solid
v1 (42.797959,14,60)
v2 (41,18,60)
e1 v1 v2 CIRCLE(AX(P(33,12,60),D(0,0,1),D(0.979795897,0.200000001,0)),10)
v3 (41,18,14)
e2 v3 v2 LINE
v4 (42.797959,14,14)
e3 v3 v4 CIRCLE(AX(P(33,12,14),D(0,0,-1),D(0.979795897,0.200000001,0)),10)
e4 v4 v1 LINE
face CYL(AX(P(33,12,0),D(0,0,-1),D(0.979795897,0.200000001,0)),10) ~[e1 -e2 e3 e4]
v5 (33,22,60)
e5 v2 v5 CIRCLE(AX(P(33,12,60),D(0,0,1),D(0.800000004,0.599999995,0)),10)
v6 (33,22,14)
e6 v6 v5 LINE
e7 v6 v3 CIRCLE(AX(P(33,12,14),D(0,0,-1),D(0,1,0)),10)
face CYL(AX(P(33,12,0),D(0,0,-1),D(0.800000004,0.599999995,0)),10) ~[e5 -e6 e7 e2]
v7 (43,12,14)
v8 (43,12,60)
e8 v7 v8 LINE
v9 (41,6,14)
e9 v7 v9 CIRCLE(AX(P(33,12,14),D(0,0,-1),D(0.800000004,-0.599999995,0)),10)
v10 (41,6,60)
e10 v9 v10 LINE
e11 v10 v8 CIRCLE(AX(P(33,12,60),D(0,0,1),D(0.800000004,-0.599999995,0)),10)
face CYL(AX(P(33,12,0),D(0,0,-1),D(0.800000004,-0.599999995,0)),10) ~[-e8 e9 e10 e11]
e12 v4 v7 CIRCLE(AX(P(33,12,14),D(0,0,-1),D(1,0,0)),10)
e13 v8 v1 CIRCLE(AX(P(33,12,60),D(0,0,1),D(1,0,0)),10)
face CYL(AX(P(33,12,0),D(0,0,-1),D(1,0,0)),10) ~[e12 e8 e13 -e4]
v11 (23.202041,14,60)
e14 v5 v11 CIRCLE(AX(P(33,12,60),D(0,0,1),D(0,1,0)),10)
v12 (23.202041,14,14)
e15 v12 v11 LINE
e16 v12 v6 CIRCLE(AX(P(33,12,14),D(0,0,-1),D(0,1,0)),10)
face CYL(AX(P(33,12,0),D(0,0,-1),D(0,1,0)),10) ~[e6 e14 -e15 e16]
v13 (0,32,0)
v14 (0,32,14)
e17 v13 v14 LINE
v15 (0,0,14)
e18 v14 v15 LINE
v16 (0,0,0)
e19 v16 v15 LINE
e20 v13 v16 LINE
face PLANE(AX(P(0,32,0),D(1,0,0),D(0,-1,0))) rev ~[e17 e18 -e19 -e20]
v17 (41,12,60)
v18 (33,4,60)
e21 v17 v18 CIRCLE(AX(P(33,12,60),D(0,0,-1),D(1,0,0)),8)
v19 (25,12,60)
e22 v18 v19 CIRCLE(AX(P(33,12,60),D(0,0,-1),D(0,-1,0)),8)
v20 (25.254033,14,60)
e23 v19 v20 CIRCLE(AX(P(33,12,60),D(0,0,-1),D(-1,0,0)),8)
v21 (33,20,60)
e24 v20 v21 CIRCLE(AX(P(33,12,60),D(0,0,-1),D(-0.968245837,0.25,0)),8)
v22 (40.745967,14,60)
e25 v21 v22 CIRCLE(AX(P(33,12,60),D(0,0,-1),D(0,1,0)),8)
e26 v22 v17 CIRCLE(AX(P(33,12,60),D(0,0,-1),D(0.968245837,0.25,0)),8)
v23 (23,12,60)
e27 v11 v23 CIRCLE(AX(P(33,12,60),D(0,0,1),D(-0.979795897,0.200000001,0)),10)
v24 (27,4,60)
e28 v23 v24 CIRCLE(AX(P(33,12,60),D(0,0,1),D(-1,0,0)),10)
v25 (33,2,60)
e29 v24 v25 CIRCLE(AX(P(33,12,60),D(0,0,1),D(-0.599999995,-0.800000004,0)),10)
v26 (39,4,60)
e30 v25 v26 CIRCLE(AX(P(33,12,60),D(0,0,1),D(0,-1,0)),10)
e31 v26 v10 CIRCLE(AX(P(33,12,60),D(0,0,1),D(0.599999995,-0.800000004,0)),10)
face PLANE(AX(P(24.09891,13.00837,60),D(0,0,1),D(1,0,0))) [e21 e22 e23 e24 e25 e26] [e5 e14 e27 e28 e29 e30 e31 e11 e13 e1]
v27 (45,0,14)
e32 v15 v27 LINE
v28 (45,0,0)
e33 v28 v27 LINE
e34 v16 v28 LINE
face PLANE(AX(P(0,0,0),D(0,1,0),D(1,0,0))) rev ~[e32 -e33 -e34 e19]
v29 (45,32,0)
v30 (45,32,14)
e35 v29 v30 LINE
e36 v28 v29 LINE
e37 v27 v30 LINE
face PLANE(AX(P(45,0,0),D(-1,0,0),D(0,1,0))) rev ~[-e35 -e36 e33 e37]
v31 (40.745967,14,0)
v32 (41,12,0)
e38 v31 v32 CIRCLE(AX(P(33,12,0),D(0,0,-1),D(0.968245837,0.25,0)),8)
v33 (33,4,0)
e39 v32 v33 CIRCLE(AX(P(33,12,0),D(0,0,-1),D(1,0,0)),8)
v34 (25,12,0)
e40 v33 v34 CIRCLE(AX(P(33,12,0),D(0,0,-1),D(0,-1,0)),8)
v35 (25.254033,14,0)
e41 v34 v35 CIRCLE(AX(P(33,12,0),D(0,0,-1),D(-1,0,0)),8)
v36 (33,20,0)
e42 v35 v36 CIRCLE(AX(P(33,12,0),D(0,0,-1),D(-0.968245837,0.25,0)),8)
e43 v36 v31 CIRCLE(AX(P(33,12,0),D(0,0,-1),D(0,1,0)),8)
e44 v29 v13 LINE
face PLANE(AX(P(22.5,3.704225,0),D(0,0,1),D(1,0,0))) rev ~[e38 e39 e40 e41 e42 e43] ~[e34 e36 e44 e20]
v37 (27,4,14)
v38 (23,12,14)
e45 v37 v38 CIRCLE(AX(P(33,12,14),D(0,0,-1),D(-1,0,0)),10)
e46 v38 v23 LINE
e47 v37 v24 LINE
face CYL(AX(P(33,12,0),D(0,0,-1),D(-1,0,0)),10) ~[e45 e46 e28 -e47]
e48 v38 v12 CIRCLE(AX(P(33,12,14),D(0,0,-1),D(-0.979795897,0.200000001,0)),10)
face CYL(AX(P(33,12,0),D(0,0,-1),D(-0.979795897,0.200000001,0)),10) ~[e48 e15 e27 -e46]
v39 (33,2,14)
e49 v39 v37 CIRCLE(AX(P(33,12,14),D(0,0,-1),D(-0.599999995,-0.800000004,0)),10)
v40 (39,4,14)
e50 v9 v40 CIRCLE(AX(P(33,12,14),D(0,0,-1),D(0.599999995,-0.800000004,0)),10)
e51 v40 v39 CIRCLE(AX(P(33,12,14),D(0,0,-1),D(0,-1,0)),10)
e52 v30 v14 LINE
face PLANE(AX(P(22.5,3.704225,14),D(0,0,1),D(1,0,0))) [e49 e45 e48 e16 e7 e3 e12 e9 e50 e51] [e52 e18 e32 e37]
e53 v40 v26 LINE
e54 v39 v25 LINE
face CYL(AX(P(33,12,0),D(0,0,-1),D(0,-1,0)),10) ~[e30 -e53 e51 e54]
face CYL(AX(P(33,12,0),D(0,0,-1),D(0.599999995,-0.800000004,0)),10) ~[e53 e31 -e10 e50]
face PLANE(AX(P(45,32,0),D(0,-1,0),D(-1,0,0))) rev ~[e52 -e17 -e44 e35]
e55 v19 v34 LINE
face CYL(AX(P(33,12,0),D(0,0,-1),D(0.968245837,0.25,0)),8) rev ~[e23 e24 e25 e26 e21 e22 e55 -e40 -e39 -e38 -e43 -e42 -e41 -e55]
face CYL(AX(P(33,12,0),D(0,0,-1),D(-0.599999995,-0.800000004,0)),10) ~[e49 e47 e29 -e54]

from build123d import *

# Parameters (mm, degrees)
F1_DEPTH = 14
F2_DEPTH = 60


with BuildPart() as f1:
    # F0 (on Top) → F1 (new body)
    with BuildSketch(Plane.XY):
        Polygon((0, 14), (0, 0), (45, 0), (45, 14), (43, 14), (43, 12), (43, 2), (33, 2), (2, 2), (2, 4), (2, 12), (2, 14), align=None)
        Polygon((0, 32), (0, 14), (2, 14), (2, 30), (33, 30), (41, 30), (43, 30), (43, 14), (45, 14), (45, 32), align=None)
        with BuildLine():
            Line((23.2020410745, 14), (2, 14))
            Line((2, 14), (2, 12))
            Line((2, 12), (23.0000000447, 12))
            ThreePointArc((23.0000000447, 12), (23.0506385149, 13.0050896201), (23.2020410745, 14))
        make_face()
        with BuildLine():
            Line((2, 30), (2, 14))
            Line((2, 14), (23.2020410745, 14))
            ThreePointArc((23.2020410745, 14), (26.6754447115, 19.7459666607), (33, 21.9999999553))
            Line((33, 21.9999999553), (33, 30))
            Line((33, 30), (2, 30))
        make_face()
        with BuildLine():
            Line((42.7979589255, 14), (43, 14))
            Line((43, 14), (43, 30))
            Line((43, 30), (41, 30))
            Line((41, 30), (41, 17.9999999255))
            ThreePointArc((41, 17.9999999255), (42.1209558342, 16.0997760642), (42.7979589255, 14))
        make_face()
        with BuildLine():
            Line((43, 12), (43, 14))
            Line((43, 14), (42.7979589255, 14))
            ThreePointArc((42.7979589255, 14), (42.9493614851, 13.0050896201), (42.9999999553, 12))
        make_face()
        with BuildLine():
            Line((23.0000000447, 12), (2, 12))
            Line((2, 12), (2, 4))
            Line((2, 4), (27.0000000745, 4))
            ThreePointArc((27.0000000745, 4), (24.0557281433, 7.5278640383), (23.0000000447, 12))
        make_face()
        with BuildLine():
            Line((25.2540333076, 14), (23.2020410745, 14))
            ThreePointArc((23.2020410745, 14), (23.0506385149, 13.0050896201), (23.0000000447, 12))
            Line((23.0000000447, 12), (25, 12))
            ThreePointArc((25, 12), (25.0637624299, 13.0080343399), (25.2540333076, 14))
        make_face()
        with BuildLine():
            ThreePointArc((33, 21.9999999553), (26.6754447115, 19.7459666607), (23.2020410745, 14))
            Line((23.2020410745, 14), (25.2540333076, 14))
            ThreePointArc((25.2540333076, 14), (28.1010205144, 18.3245553203), (33, 20))
            Line((33, 20), (33, 21.9999999553))
        make_face()
        with BuildLine():
            ThreePointArc((41, 6.0000000745), (42.4868329475, 8.8377223822), (42.9999999553, 12))
            ThreePointArc((42.9999999553, 12), (42.9493614851, 13.0050896201), (42.7979589255, 14))
            Line((42.7979589255, 14), (41, 14))
            Line((41, 14), (41, 12))
            Line((41, 12), (41, 6.0000000745))
        make_face()
        with BuildLine():
            Line((43, 2), (43, 12))
            ThreePointArc((42.9999999553, 12), (42.4868329475, 8.8377223822), (41, 6.0000000745))
            Line((41, 6.0000000745), (41, 4))
            Line((41, 4), (38.9999999255, 4))
            ThreePointArc((38.9999999255, 4), (36.1622776178, 2.5131670525), (33, 2.0000000447))
            Line((33, 2), (43, 2))
        make_face()
        with BuildLine():
            Line((41, 14), (42.7979589255, 14))
            ThreePointArc((42.7979589255, 14), (42.1209558342, 16.0997760642), (41, 17.9999999255))
            Line((41, 17.9999999255), (41, 14))
        make_face()
        with BuildLine():
            Line((27.0000000745, 4), (2, 4))
            Line((2, 4), (2, 2))
            Line((2, 2), (33, 2))
            ThreePointArc((33, 2.0000000447), (29.8377223822, 2.5131670525), (27.0000000745, 4))
        make_face()
        with BuildLine():
            Line((25, 12), (23.0000000447, 12))
            ThreePointArc((23.0000000447, 12), (24.0557281433, 7.5278640383), (27.0000000745, 4))
            Line((27.0000000745, 4), (33, 4))
            ThreePointArc((33, 4), (27.3431457505, 6.3431457505), (25, 12))
        make_face()
        with BuildLine():
            Line((41, 30), (33, 30))
            Line((33, 30), (33, 21.9999999553))
            ThreePointArc((33, 21.9999999553), (37.4721359617, 20.9442718567), (41, 17.9999999255))
            Line((41, 17.9999999255), (41, 30))
        make_face()
        with BuildLine():
            ThreePointArc((38.9999999255, 4), (40.0710677803, 4.9289322197), (41, 6.0000000745))
            Line((41, 6.0000000745), (41, 12))
            ThreePointArc((41, 12), (38.6568542495, 6.3431457505), (33, 4))
            Line((33, 4), (38.9999999255, 4))
        make_face()
        with BuildLine():
            Line((41, 4), (41, 6.0000000745))
            ThreePointArc((41, 6.0000000745), (40.0710677803, 4.9289322197), (38.9999999255, 4))
            Line((38.9999999255, 4), (41, 4))
        make_face()
        with BuildLine():
            Line((41, 12), (41, 14))
            Line((41, 14), (40.7459666924, 14))
            ThreePointArc((40.7459666924, 14), (40.9362375701, 13.0080343399), (41, 12))
        make_face()
        with BuildLine():
            Line((33, 4), (27.0000000745, 4))
            ThreePointArc((27.0000000745, 4), (29.8377223822, 2.5131670525), (33, 2.0000000447))
            ThreePointArc((33, 2.0000000447), (36.1622776178, 2.5131670525), (38.9999999255, 4))
            Line((38.9999999255, 4), (33, 4))
        make_face()
    extrude(amount=F1_DEPTH)

    # F0 (on Top) → F2 (join)
    with BuildSketch(Plane.XY):
        with BuildLine():
            Line((25.2540333076, 14), (23.2020410745, 14))
            ThreePointArc((23.2020410745, 14), (23.0506385149, 13.0050896201), (23.0000000447, 12))
            Line((23.0000000447, 12), (25, 12))
            ThreePointArc((25, 12), (25.0637624299, 13.0080343399), (25.2540333076, 14))
        make_face()
        with BuildLine():
            ThreePointArc((33, 21.9999999553), (26.6754447115, 19.7459666607), (23.2020410745, 14))
            Line((23.2020410745, 14), (25.2540333076, 14))
            ThreePointArc((25.2540333076, 14), (28.1010205144, 18.3245553203), (33, 20))
            Line((33, 20), (33, 21.9999999553))
        make_face()
        with BuildLine():
            ThreePointArc((41, 6.0000000745), (42.4868329475, 8.8377223822), (42.9999999553, 12))
            ThreePointArc((42.9999999553, 12), (42.9493614851, 13.0050896201), (42.7979589255, 14))
            Line((42.7979589255, 14), (41, 14))
            Line((41, 14), (41, 12))
            Line((41, 12), (41, 6.0000000745))
        make_face()
        with BuildLine():
            Line((41, 14), (42.7979589255, 14))
            ThreePointArc((42.7979589255, 14), (42.1209558342, 16.0997760642), (41, 17.9999999255))
            Line((41, 17.9999999255), (41, 14))
        make_face()
        with BuildLine():
            Line((25, 12), (23.0000000447, 12))
            ThreePointArc((23.0000000447, 12), (24.0557281433, 7.5278640383), (27.0000000745, 4))
            Line((27.0000000745, 4), (33, 4))
            ThreePointArc((33, 4), (27.3431457505, 6.3431457505), (25, 12))
        make_face()
        with BuildLine():
            ThreePointArc((41, 17.9999999255), (37.4721359617, 20.9442718567), (33, 21.9999999553))
            Line((33, 21.9999999553), (33, 20))
            ThreePointArc((33, 20), (37.8989794856, 18.3245553203), (40.7459666924, 14))
            Line((40.7459666924, 14), (41, 14))
            Line((41, 14), (41, 17.9999999255))
        make_face()
        with BuildLine():
            ThreePointArc((38.9999999255, 4), (40.0710677803, 4.9289322197), (41, 6.0000000745))
            Line((41, 6.0000000745), (41, 12))
            ThreePointArc((41, 12), (38.6568542495, 6.3431457505), (33, 4))
            Line((33, 4), (38.9999999255, 4))
        make_face()
        with BuildLine():
            Line((41, 12), (41, 14))
            Line((41, 14), (40.7459666924, 14))
            ThreePointArc((40.7459666924, 14), (40.9362375701, 13.0080343399), (41, 12))
        make_face()
        with BuildLine():
            Line((33, 4), (27.0000000745, 4))
            ThreePointArc((27.0000000745, 4), (29.8377223822, 2.5131670525), (33, 2.0000000447))
            ThreePointArc((33, 2.0000000447), (36.1622776178, 2.5131670525), (38.9999999255, 4))
            Line((38.9999999255, 4), (33, 4))
        make_face()
    extrude(amount=F2_DEPTH)


solid = f1.part
